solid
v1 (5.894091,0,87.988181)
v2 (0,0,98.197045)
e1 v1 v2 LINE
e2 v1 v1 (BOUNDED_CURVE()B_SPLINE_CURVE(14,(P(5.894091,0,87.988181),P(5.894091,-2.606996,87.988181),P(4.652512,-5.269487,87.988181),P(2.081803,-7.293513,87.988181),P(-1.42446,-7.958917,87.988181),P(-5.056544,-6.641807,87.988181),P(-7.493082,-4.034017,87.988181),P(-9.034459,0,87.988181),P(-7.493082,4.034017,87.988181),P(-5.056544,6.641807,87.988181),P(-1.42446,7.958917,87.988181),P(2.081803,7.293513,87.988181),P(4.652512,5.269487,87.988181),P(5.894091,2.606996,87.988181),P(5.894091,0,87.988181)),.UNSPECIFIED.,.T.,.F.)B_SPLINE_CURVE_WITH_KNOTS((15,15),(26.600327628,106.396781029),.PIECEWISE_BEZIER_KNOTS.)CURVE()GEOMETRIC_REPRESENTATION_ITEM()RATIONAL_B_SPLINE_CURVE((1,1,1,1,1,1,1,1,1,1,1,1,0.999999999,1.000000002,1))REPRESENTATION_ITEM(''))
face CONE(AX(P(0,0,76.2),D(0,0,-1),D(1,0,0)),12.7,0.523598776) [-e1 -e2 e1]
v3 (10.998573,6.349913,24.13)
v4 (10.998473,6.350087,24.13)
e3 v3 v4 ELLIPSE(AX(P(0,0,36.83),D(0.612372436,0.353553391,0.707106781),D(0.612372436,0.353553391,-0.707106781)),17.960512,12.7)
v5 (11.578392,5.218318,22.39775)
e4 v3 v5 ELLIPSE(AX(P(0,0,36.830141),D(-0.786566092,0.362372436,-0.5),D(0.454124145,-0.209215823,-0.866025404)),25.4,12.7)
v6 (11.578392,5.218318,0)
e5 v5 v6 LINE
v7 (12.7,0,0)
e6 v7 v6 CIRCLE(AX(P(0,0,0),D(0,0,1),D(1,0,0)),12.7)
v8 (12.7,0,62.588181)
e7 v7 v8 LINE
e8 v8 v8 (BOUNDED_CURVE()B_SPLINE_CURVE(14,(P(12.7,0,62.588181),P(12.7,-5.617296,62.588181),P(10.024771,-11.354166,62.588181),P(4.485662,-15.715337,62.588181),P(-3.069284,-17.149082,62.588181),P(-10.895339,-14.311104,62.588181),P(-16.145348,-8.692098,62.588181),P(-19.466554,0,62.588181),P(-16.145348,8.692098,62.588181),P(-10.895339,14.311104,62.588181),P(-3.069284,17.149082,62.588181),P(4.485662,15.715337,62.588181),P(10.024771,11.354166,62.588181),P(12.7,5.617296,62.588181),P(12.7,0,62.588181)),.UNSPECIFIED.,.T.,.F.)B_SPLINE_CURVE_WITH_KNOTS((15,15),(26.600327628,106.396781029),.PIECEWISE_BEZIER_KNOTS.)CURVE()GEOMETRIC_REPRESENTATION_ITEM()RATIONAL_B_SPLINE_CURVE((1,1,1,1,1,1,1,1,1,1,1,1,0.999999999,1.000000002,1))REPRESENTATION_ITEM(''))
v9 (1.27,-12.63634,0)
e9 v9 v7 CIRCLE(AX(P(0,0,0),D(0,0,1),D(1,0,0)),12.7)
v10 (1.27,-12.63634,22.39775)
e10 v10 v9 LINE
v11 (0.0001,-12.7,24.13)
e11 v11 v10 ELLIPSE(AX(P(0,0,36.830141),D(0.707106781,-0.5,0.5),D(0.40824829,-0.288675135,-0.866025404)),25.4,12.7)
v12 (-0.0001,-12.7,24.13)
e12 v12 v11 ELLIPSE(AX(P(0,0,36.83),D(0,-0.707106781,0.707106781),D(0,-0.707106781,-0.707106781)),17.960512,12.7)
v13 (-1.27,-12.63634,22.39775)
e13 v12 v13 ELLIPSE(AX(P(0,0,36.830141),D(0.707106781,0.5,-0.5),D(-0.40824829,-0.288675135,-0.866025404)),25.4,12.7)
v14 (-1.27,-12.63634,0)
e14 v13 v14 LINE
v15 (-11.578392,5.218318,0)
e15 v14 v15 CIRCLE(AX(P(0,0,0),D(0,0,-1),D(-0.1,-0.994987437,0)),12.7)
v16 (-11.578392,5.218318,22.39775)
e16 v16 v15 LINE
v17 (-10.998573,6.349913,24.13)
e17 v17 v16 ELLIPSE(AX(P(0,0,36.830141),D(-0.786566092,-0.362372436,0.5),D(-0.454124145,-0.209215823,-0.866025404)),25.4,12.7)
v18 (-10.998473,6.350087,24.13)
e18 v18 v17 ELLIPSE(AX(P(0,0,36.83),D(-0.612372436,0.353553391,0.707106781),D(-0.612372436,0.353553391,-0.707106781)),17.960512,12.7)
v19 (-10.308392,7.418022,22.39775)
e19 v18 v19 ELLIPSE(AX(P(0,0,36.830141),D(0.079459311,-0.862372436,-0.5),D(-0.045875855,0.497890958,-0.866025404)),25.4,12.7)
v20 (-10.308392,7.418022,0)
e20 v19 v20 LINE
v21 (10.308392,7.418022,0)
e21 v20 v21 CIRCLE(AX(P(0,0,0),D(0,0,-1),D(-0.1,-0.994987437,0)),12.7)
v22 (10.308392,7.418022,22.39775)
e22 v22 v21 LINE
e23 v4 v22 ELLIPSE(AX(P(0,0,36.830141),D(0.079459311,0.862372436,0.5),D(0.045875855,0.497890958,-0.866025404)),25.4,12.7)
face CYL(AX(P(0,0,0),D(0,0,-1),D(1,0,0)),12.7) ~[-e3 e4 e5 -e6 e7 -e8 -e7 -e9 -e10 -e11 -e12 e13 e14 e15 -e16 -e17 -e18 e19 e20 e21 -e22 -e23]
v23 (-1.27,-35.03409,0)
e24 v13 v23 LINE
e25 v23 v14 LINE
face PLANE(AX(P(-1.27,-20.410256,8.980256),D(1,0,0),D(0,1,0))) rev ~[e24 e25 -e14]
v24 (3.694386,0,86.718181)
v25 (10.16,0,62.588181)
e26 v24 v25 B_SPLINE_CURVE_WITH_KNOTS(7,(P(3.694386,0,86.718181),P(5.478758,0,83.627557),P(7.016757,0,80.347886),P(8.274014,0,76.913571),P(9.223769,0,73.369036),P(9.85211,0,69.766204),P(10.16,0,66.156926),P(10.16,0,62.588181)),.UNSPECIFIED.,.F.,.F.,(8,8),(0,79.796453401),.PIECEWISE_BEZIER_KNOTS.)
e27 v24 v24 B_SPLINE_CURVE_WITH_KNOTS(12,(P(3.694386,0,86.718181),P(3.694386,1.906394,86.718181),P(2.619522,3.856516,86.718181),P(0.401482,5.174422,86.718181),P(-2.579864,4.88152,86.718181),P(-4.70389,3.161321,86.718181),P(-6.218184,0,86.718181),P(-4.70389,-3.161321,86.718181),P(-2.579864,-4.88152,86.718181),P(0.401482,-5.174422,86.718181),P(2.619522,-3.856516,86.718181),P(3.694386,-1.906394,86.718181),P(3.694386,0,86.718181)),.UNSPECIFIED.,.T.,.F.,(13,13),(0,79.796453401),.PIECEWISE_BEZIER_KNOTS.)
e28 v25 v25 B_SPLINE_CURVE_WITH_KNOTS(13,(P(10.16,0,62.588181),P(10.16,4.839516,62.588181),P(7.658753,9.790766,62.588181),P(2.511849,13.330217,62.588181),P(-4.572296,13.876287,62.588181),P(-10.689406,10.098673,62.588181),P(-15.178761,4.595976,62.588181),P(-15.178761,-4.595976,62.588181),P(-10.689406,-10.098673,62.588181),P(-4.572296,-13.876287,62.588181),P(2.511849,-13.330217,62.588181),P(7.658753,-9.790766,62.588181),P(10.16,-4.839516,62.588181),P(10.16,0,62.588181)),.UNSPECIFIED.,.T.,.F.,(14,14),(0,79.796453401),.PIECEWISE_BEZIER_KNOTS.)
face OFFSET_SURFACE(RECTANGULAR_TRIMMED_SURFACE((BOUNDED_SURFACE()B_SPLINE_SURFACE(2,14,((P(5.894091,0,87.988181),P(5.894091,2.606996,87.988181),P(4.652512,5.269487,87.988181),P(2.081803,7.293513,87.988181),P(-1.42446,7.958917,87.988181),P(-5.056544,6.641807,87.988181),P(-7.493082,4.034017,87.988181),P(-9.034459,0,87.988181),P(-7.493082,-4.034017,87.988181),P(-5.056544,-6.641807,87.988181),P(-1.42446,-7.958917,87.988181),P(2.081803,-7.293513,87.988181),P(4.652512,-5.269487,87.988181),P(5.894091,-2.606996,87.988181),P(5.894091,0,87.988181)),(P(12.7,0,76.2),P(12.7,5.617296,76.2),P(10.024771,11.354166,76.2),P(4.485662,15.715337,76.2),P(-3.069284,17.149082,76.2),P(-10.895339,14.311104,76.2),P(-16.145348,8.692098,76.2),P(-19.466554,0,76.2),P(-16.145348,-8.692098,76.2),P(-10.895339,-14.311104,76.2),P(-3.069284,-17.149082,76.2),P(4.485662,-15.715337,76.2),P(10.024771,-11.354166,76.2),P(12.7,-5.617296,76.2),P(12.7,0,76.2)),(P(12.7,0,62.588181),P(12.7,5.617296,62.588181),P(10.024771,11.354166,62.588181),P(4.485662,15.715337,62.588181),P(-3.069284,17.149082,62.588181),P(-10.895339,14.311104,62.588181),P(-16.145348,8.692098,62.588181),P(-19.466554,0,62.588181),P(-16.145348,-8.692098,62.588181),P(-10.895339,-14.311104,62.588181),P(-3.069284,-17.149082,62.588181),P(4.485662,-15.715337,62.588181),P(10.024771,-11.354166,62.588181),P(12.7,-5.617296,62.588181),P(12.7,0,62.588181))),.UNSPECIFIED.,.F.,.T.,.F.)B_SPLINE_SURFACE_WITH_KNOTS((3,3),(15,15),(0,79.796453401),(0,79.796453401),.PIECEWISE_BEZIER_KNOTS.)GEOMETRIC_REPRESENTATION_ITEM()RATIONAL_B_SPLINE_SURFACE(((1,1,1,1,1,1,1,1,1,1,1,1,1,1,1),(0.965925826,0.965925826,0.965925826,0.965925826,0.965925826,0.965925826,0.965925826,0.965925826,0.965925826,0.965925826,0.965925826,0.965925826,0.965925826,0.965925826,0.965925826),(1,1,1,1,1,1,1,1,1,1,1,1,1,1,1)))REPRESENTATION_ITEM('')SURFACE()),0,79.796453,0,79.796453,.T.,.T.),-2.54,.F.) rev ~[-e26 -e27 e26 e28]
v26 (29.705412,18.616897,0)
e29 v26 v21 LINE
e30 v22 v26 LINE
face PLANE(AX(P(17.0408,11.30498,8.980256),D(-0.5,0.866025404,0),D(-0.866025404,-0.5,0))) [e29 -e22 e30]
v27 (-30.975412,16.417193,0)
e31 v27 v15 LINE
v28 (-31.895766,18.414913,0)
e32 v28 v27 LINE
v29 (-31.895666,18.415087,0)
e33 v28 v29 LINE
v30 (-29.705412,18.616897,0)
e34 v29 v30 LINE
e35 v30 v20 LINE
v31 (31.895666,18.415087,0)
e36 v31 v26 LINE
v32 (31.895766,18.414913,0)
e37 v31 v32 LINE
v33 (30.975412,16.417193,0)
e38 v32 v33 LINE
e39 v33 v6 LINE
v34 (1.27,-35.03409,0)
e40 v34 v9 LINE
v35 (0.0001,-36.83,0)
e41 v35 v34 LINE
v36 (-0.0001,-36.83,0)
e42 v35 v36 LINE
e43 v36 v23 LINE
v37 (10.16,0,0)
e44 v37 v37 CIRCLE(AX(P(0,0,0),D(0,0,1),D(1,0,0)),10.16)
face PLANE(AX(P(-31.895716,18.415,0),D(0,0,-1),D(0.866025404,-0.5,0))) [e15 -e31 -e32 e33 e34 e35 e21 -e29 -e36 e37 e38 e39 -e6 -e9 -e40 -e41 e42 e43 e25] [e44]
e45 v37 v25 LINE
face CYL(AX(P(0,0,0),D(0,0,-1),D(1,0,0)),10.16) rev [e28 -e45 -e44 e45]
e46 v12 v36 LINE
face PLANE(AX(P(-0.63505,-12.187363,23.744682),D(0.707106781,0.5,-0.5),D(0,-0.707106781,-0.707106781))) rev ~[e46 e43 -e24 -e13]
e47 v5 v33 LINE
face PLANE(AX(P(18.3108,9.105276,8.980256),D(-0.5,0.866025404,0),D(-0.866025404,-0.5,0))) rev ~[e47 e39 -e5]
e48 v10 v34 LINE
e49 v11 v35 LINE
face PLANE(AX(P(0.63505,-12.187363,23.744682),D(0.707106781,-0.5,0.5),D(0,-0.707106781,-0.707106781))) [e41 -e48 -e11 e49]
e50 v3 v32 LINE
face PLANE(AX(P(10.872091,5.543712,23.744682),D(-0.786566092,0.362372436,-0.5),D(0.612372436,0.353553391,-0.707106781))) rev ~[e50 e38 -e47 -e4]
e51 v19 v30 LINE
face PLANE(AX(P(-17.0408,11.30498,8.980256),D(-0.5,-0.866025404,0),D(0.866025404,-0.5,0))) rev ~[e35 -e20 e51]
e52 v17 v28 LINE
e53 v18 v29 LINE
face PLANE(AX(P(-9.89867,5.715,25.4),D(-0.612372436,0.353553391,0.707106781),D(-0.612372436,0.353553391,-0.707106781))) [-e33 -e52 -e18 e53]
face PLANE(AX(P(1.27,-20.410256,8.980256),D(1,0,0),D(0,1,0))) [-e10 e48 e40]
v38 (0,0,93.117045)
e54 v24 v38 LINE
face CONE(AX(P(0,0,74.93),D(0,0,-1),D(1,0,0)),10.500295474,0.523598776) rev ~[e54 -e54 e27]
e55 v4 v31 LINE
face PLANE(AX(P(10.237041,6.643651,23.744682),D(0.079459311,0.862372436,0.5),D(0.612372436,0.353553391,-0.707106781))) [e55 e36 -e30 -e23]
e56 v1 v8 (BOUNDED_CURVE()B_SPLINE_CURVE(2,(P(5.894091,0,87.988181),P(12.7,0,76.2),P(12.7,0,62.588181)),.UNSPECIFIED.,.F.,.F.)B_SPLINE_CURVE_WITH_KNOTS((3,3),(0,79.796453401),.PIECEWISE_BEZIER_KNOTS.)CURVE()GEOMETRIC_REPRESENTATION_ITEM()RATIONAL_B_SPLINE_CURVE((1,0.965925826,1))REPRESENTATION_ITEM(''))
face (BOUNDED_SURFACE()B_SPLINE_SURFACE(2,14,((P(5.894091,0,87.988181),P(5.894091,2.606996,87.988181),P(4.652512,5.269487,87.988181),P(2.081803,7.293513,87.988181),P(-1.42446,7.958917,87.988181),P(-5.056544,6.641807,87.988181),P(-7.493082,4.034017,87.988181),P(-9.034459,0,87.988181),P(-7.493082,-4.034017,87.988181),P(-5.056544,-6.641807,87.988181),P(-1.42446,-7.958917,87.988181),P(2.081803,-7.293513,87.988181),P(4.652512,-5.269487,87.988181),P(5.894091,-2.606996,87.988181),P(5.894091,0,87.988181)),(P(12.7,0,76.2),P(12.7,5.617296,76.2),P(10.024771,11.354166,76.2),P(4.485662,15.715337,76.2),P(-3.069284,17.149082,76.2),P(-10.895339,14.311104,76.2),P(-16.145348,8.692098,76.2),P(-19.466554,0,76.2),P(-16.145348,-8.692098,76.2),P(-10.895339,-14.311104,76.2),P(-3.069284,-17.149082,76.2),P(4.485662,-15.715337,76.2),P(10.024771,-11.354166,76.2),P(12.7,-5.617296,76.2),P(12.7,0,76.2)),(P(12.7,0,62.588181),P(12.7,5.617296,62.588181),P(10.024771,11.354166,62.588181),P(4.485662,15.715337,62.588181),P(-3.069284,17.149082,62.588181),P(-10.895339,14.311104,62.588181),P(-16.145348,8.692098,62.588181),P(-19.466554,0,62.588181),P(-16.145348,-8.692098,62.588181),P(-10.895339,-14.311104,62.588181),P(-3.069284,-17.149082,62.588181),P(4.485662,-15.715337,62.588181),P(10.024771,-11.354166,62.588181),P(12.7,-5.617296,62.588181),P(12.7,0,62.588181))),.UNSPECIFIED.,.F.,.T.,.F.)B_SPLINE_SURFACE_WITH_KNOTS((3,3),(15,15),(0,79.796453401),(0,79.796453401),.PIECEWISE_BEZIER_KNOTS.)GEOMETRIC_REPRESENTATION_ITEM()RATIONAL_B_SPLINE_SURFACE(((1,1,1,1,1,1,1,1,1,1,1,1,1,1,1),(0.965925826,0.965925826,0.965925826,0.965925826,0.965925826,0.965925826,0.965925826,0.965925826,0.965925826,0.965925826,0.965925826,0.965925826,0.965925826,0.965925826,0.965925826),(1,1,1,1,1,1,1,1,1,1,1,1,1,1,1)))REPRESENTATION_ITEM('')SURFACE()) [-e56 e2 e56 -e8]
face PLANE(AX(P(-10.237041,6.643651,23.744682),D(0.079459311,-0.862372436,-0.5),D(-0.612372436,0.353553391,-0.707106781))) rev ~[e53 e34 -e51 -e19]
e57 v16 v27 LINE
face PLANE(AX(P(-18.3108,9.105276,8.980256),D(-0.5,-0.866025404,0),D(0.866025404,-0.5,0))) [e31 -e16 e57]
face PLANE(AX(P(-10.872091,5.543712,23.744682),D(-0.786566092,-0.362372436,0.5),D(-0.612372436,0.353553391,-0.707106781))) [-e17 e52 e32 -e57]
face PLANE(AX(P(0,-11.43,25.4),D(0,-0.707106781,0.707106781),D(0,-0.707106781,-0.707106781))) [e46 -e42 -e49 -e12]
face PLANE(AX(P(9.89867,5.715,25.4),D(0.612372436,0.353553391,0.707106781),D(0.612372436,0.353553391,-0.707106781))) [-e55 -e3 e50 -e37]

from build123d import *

# Parameters (mm, degrees)
F0_R      = 12.7
F1_DEPTH  = 76.2
F1_FACE_R = 12.7
F2_DEPTH  = 25.4
F2_TAPER  = 30
F3_R      = 50.8
F4_T      = -2.54
F6_DEPTH  = 1.27
F7_SIZE   = 1.2699
F8_COUNT  = 3


# Not quite as in the source:
# - a fillet or chamfer is up to 0.001 mm smaller than in the source, because OpenCascade refuses the exact size


with BuildPart() as f1:
    # F0 (on Top) → F1 (new body)
    with BuildSketch(Plane.XY):
        Circle(F0_R)
    extrude(amount=F1_DEPTH)

    # F1_face (on face) → F2 (join)
    with BuildSketch(Plane.XY.offset(76.2)):
        Circle(F1_FACE_R)
    extrude(amount=F2_DEPTH, taper=F2_TAPER)

    # F3
    f3_edges = [f1.edges().sort_by_distance(p)[0] for p in [
        (-12.7, 0, 76.2),
    ]]
    fillet(f3_edges, radius=F3_R)

    # F4
    f4_openings = [f1.faces().sort_by_distance(p)[0] for p in [
        (0, 0, 0),
    ]]
    offset(amount=F4_T, openings=f4_openings)

    # F5 (on Right) → F6 (join, symmetric)
    with BuildSketch(Plane.YZ):
        Polygon((-36.83, 0), (-11.43, 0), (-11.43, 25.4), align=None)
    extrude(amount=F6_DEPTH, both=True)

    # F7 (size 1.27 in the source; OpenCascade refuses exactly that, so slightly less here)
    f7_edges = [f1.edges().sort_by_distance(p)[0] for p in [
        (1.27, -24.73317, 12.09683),
        (-1.27, -24.73317, 12.09683),
    ]]
    chamfer(f7_edges, length=F7_SIZE)

    # F8: F1 ×3 about axis
    f8_axis = Axis((0, 0, 0), (0, 0, 1))


with BuildPart() as f1_1:
    add(f1.part)
    for i in range(1, F8_COUNT):
        add(f1.part.rotate(f8_axis, i * 360 / F8_COUNT))


solid = f1_1.part
